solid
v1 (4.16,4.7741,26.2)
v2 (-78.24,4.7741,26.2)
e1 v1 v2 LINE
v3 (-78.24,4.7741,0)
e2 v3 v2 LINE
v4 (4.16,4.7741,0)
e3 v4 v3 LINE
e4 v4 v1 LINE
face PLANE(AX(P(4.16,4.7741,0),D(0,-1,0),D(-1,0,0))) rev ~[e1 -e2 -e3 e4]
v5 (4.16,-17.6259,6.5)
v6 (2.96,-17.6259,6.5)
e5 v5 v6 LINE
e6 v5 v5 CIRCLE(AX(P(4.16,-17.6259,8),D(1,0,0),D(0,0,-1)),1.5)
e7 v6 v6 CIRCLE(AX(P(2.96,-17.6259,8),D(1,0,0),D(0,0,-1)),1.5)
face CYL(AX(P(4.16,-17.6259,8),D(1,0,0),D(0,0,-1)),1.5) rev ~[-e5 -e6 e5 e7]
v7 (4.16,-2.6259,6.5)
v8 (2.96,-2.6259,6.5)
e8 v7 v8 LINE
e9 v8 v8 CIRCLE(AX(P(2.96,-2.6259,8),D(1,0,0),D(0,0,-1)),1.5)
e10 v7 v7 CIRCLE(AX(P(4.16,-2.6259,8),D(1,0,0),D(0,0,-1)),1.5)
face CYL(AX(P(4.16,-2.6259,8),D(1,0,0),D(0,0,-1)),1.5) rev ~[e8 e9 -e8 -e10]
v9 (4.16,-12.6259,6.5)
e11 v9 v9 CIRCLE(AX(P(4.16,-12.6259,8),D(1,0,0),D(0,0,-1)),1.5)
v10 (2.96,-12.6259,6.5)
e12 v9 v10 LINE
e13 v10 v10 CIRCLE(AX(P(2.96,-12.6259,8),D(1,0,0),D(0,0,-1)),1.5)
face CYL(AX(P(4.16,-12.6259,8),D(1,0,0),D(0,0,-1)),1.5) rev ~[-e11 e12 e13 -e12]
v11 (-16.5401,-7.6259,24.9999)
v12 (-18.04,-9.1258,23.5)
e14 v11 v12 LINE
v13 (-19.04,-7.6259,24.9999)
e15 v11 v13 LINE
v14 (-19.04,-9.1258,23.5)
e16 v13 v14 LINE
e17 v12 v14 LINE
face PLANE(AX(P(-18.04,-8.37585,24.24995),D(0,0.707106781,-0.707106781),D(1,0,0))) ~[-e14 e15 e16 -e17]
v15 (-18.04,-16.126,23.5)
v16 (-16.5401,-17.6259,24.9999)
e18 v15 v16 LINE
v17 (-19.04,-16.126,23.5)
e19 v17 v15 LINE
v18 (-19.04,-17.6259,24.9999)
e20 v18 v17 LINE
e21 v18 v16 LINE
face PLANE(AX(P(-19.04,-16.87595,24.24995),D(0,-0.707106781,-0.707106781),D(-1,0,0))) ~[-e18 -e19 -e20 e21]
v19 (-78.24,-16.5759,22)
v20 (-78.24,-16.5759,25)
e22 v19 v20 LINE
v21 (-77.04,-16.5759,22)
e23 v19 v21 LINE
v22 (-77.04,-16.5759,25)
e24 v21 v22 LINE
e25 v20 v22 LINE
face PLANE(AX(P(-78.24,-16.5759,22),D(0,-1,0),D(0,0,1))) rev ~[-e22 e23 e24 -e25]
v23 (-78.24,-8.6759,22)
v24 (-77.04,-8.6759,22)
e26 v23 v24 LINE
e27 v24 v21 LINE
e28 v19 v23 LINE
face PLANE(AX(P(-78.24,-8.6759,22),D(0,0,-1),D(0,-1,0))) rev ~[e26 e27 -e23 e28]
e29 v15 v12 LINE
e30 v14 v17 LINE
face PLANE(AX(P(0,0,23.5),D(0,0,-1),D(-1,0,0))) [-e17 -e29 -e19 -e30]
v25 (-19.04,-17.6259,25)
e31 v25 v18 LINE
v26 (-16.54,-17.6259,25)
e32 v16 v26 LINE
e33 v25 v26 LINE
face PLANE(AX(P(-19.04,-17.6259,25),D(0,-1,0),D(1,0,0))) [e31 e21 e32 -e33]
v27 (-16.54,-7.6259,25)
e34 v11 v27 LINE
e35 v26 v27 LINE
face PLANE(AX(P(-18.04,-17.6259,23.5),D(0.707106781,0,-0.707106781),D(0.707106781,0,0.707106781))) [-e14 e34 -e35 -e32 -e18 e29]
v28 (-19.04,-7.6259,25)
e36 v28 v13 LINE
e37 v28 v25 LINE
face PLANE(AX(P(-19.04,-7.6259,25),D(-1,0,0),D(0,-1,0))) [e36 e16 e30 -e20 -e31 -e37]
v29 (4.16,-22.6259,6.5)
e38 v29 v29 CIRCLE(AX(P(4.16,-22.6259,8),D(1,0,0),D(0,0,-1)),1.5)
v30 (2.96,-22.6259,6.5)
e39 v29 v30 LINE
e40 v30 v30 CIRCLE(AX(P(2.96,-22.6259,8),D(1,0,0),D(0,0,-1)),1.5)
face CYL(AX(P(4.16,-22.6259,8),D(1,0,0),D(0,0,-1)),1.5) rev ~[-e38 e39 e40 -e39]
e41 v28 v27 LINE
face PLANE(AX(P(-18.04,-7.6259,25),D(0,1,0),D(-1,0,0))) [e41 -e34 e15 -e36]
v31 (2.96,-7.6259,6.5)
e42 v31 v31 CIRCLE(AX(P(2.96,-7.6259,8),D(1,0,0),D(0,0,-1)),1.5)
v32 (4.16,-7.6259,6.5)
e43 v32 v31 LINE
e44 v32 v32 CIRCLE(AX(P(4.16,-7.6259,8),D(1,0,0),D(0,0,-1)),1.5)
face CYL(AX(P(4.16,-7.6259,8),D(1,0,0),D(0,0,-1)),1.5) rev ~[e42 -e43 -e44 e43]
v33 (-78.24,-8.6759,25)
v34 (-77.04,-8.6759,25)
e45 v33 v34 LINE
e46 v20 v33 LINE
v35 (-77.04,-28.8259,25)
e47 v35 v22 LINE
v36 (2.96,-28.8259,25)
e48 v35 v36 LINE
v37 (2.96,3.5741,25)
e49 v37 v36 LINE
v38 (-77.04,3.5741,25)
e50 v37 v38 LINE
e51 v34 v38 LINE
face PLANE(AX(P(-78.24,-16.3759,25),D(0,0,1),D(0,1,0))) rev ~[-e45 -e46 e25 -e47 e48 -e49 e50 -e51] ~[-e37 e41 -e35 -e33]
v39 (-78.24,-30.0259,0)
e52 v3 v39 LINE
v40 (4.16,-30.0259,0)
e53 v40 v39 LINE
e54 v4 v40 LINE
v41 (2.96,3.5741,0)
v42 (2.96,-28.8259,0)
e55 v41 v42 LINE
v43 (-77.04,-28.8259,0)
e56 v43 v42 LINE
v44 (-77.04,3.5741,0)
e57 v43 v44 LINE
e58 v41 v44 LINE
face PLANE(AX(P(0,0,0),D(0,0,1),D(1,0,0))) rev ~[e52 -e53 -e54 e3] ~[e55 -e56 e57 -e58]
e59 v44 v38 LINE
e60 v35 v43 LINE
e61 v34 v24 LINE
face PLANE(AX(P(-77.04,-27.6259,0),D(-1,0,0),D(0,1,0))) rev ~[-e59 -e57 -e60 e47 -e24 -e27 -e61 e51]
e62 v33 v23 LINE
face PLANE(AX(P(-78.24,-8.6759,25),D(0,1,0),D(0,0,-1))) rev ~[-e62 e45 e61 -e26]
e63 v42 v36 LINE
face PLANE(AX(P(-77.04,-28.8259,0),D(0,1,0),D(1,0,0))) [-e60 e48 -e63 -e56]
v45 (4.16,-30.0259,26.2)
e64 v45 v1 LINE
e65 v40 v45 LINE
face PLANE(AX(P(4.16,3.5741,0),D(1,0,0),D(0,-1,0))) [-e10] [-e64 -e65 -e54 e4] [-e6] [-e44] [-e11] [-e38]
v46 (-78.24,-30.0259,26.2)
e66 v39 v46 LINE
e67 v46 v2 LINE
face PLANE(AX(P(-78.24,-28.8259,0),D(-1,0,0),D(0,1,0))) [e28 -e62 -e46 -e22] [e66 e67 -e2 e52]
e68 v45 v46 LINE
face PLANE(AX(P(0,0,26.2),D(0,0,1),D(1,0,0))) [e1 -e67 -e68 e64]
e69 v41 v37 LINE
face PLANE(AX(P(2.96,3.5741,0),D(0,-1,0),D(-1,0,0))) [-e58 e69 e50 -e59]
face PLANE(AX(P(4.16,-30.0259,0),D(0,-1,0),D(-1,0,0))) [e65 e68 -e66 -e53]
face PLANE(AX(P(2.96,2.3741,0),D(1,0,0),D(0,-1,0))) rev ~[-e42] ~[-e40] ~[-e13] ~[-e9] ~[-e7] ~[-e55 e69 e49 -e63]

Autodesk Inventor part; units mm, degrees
ref_plane "YZ Plane" through (0, 0, 0) normal (1, 0, 0) x (0, 1, 0)
ref_plane "XZ Plane" through (0, 0, 0) normal (0, 1, 0) x (-1, 0, 0)
ref_plane "XY Plane" through (0, 0, 0) normal (0, 0, 1) x (1, 0, 0)
sketch "Sketch1" plane through (0, 0, 0) normal (0, 0, 1) x (1, 0, 0)
  line L0 (-78.24, 3.5741) -> (4.16, 3.5741)
  line L1 (4.16, 3.5741) -> (4.16, -28.8259)
  line L2 (4.16, -28.8259) -> (-78.24, -28.8259)
  line L3 (-78.24, -28.8259) -> (-78.24, 3.5741)
  line L4 (-77.04, 2.3741) -> (2.96, 2.3741)
  line L5 (2.96, 2.3741) -> (2.96, -27.6259)
  line L6 (2.96, -27.6259) -> (-77.04, -27.6259)
  line L7 (-77.04, -27.6259) -> (-77.04, 2.3741)
  point P0 (0, 0)
  dimension "d0" = 32.4
  dimension "d1" = 82.4
  dimension "d2" = 1.2
  dimension "d3" = 1.2
  dimension "d4" = 1.2
  dimension "d5" = 1.2
extrude "Extrusion1" add sketch "Sketch1" along normal blind 25
sketch "Sketch2" plane through (0, 0, 25) normal (0, 0, 1) x (1, 0, 0)
  line L0 (-78.24, 3.5741) -> (4.16, 3.5741)
  line L1 (4.16, 3.5741) -> (4.16, -28.8259)
  line L2 (4.16, -28.8259) -> (-78.24, -28.8259)
  line L3 (-78.24, -28.8259) -> (-78.24, 3.5741)
  point P0 (0, 0)
extrude "Extrusion2" add sketch "Sketch2" along normal blind 1.2
sketch "Sketch3" plane through (-78.24, -28.8259, 0) normal (-1, 0, 0) x (0, 0, 1)
  line L0 (25, 1.2) -> (25, 31.2) projected
  line L1 (25, 12.45) -> (22, 12.45)
  line L2 (22, 12.45) -> (22, 19.95)
  line L3 (22, 19.95) -> (25, 19.95)
  line L4 (25, 19.95) -> (25, 12.45)
  line L5 (0, 1.2) -> (25, 1.2) projected
  line L6 (0, 31.2) -> (25, 31.2) projected
  point P0 (0, 28.8259)
  dimension "d10" = 7.5
  dimension "d11" = 3
  dimension "d12" = 11.25
  dimension "d13" = 11.25
extrude "Extrusion3" cut sketch "Sketch3" against normal blind 1.2
sketch "Sketch4" plane through (0, 0, 25) normal (0, 0, -1) x (-1, 0, 0)
  point P0 (0, 0)
sketch "Sketch5" plane through (0, 0, 25) normal (0, 0, -1) x (-1, 0, 0)
  line L0 (18.04, -7.6259) -> (19.04, -7.6259)
  line L1 (19.04, -7.6259) -> (19.04, -17.6259)
  line L2 (19.04, -17.6259) -> (18.04, -17.6259)
  line L3 (18.04, -17.6259) -> (18.04, -7.6259)
  line L4 (-2.96, 2.3741) -> (77.04, 2.3741) projected
  line L5 (77.04, -27.6259) -> (-2.96, -27.6259) projected
  line L6 (77.04, 2.3741) -> (77.04, -27.6259) projected
  point P0 (0, 0)
  dimension "d16" = 1
  dimension "d17" = 10
  dimension "d18" = 10
  dimension "d19" = 10
  dimension "d20" = 58
extrude "Extrusion4" add sketch "Sketch5" along normal blind 1.5
chamfer "Chamfer1" distance 1.5 angle 45 2 edges at (-18.54, -17.6259, 23.5) (-18.54, -7.6259, 23.5)
chamfer "Chamfer2" distance 1.5 angle 45 1 edges at (-18.04, -12.6259, 25)
sketch "Sketch6" plane through (-78.24, -28.8259, 0) normal (0, -1, 0) x (1, 0, 0)
  circle A0 centre (3.7, 12.5) radius 2.5
  line L0 (1.2, 0) -> (1.2, 25) projected
  point P0 (78.24, 0)
  dimension "d29" = 5
  dimension "d30" = 2.5
extrude "Extrusion5" cut sketch "Sketch6" against normal blind 40
sketch "Sketch7" plane through (4.16, -28.8259, 0) normal (1, 0, 0) x (0, 0, -1)
  line L0 (0, 31.2) -> (-25, 31.2) projected
  line L1 (0, 32.4) -> (0, 0) projected
  circle A0 centre (-8, 26.2) radius 1.5
  circle A1 centre (-8, 21.2) radius 1.5
  circle A2 centre (-8, 16.2) radius 1.5
  circle A3 centre (-8, 11.2) radius 1.5
  circle A4 centre (-8, 6.2) radius 1.5
  line L2 (0, 1.2) -> (-25, 1.2) projected
  point P0 (0, 28.8259)
  point P1 (-8, 31.2)
  dimension "d33" = 8
  dimension "d34" = 3
  dimension "d35" = 3
  dimension "d36" = 3
  dimension "d37" = 3
  dimension "d38" = 3
  dimension "d39" = 5
  dimension "d40" = 5
  dimension "d41" = 5
  dimension "d42" = 5
  dimension "d43" = 5
  dimension "d44" = 5
extrude "Extrusion6" cut sketch "Sketch7" against normal blind 3
sketch "Sketch8" plane through (0, 0, 0) normal (0, 0, -1) x (-1, 0, 0)
  line L0 (78.24, -28.8259) -> (-4.16, -28.8259)
  line L1 (-4.16, -28.8259) -> (-4.16, -30.0259)
  line L2 (-4.16, -30.0259) -> (78.24, -30.0259)
  line L3 (78.24, -30.0259) -> (78.24, -28.8259)
  line L4 (78.24, 3.5741) -> (-4.16, 3.5741)
  line L5 (-4.16, 3.5741) -> (-4.16, 4.7741)
  line L6 (-4.16, 4.7741) -> (78.24, 4.7741)
  line L7 (78.24, 4.7741) -> (78.24, 3.5741)
  line L8 (-4.16, 3.5741) -> (-4.16, -28.8259) projected
  point P0 (0, 0)
  dimension "d47" = 1.2
  dimension "d48" = 1.2
extrude "Extrusion7" add sketch "Sketch8" against normal blind 26.2
sketch "Sketch9" plane through (0, 0, 0) normal (0, 0, -1) x (-1, 0, 0)
  line L0 (-2.96, -27.6259) -> (77.04, -27.6259)
  line L1 (77.04, -27.6259) -> (77.04, -28.8259)
  line L2 (77.04, -28.8259) -> (-2.96, -28.8259)
  line L3 (-2.96, -28.8259) -> (-2.96, -27.6259)
  line L4 (77.04, 2.3741) -> (-2.96, 2.3741)
  line L5 (-2.96, 2.3741) -> (-2.96, 3.5741)
  line L6 (-2.96, 3.5741) -> (77.04, 3.5741)
  line L7 (77.04, 3.5741) -> (77.04, 2.3741)
  line L8 (-2.96, 2.3741) -> (77.04, 2.3741) projected
  line L9 (77.04, 2.3741) -> (77.04, -27.6259) projected
  point P0 (0, 0)
  dimension "d51" = 1.2
  dimension "d52" = 1.2
extrude "Extrusion8" cut sketch "Sketch9" against normal blind 25
sketch "Sketch10" plane through (-78.24, -30.0259, 0) normal (-1, 0, 0) x (0, 0, 1)
  line L0 (25, 21.15) -> (25, 33.6) projected
  line L1 (22, 13.45) -> (25, 13.45)
  line L2 (25, 13.45) -> (25, 21.35)
  line L3 (25, 21.35) -> (22, 21.35)
  line L4 (22, 21.35) -> (22, 13.45)
  line L5 (25, 13.65) -> (22, 13.65) projected
  line L6 (22, 21.15) -> (25, 21.15) projected
  line L7 (22, 13.65) -> (22, 21.15) projected
  point P0 (0, 30.0259)
  dimension "d55" = 0.2
  dimension "d56" = 0.2
extrude "Extrusion9" cut sketch "Sketch10" against normal blind 2
sketch "Sketch11" plane through (0, 0, 25) normal (0, 0, -1) x (-1, 0, 0)
  point P0 (0, 0)
properties part number "Case Botom v2"
